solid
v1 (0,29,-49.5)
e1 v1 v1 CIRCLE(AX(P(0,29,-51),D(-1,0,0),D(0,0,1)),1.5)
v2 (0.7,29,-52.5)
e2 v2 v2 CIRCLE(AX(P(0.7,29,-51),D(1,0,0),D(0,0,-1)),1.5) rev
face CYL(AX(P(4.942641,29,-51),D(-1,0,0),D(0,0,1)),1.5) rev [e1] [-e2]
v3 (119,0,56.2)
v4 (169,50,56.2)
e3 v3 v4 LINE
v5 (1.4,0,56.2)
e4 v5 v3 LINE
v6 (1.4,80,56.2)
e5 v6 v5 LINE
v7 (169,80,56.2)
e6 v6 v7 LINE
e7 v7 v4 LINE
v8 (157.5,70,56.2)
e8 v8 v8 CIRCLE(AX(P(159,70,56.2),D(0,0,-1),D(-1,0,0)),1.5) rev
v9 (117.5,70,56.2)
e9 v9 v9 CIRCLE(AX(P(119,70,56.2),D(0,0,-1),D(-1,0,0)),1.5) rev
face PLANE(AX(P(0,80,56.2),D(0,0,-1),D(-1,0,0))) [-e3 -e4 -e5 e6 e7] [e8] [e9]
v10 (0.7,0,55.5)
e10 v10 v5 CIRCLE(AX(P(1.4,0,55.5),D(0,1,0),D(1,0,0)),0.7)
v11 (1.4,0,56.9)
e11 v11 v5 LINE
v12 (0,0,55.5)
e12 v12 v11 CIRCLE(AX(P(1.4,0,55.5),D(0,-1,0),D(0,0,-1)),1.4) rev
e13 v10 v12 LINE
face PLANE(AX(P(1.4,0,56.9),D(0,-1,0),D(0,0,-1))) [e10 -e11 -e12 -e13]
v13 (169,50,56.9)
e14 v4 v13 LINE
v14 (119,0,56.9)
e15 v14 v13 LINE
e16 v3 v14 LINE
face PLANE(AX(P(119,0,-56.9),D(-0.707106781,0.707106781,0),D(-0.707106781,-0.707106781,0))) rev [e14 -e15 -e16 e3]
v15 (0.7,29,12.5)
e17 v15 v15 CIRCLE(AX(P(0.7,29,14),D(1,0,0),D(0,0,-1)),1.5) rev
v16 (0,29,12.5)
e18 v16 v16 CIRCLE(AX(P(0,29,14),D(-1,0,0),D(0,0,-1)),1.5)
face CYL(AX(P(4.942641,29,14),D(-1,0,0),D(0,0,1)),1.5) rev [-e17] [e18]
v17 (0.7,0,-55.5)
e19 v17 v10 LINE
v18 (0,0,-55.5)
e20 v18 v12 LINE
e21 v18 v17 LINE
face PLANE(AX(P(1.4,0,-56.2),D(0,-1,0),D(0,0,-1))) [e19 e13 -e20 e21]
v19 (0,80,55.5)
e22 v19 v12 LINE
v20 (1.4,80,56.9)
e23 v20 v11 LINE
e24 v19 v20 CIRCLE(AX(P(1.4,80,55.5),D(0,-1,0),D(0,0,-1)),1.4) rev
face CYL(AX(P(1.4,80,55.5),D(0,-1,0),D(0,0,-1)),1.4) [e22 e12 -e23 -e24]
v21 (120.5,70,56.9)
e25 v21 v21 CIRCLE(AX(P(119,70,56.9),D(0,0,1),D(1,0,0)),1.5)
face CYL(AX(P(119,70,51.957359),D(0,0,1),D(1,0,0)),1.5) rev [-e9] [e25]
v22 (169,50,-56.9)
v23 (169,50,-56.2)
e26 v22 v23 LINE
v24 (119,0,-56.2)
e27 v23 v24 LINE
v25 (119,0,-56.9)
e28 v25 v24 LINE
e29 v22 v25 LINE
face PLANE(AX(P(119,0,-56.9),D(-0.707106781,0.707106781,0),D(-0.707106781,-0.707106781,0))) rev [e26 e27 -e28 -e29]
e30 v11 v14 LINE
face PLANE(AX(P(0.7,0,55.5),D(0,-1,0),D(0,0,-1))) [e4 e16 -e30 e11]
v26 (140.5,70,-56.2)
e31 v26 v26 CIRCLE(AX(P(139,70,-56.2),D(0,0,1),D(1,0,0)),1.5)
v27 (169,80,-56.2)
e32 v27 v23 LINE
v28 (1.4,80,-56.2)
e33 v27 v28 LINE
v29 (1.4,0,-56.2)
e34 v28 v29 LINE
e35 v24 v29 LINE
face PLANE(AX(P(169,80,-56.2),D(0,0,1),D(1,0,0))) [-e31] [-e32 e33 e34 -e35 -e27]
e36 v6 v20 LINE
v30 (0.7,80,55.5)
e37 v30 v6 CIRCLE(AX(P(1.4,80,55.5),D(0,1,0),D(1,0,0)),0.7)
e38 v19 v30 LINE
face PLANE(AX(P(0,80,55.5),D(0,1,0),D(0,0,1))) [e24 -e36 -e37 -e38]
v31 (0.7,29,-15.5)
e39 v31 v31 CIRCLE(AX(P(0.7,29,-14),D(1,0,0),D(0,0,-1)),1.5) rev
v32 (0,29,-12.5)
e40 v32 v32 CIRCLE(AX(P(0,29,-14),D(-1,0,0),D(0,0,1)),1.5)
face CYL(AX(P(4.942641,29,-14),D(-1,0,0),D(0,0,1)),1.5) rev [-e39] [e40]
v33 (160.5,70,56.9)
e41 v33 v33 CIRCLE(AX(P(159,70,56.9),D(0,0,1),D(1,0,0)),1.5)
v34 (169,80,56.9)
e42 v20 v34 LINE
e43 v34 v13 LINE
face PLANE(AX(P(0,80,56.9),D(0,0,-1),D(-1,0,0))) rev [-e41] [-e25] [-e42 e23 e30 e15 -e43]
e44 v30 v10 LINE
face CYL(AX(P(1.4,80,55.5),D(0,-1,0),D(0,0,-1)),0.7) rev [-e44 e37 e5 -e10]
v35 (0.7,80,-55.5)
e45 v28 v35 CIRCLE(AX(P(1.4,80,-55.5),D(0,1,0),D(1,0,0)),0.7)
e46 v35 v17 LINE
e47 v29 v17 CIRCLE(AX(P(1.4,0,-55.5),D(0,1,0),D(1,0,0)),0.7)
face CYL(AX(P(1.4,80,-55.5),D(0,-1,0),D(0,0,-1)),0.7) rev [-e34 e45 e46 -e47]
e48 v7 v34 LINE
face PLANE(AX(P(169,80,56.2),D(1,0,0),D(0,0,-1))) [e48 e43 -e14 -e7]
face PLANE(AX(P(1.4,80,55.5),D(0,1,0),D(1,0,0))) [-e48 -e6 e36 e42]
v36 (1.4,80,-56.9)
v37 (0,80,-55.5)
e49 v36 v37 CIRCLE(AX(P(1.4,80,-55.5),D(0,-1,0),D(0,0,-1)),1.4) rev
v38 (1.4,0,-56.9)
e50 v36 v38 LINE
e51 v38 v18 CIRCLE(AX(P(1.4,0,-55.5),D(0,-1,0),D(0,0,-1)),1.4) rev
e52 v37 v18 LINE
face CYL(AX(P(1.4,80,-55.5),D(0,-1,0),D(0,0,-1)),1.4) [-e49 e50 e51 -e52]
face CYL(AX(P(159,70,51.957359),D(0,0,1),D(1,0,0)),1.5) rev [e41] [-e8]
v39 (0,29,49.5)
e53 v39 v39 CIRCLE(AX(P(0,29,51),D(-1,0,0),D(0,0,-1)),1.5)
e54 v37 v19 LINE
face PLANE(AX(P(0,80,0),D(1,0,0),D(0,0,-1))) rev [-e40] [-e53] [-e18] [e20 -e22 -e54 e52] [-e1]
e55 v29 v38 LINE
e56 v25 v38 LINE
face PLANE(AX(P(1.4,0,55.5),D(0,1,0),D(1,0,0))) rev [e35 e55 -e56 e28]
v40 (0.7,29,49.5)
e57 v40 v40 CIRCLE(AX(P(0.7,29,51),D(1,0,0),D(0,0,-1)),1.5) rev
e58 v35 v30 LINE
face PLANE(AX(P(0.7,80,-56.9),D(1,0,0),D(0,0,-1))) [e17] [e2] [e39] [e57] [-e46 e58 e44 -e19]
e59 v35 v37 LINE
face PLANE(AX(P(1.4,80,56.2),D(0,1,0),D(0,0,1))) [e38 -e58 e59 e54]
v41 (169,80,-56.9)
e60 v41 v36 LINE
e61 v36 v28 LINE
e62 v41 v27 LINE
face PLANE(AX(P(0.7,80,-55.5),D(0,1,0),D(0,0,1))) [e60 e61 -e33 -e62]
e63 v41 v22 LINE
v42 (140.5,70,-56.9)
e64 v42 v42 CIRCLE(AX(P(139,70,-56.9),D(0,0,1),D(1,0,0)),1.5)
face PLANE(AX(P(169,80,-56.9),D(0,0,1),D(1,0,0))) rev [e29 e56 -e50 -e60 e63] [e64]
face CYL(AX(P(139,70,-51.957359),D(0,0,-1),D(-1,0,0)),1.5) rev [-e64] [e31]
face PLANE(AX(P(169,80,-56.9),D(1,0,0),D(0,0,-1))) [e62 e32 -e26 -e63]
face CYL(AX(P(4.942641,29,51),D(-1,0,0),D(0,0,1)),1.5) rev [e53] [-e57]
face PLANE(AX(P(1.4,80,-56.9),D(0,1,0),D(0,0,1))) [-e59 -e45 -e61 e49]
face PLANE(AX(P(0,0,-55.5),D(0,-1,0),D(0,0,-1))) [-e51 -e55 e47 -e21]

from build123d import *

# Parameters (mm, degrees)
BASE_FLANGE1_DEPTH      = 80
CUT_EXTRUDE1_DEPTH      = 219.886820069
CUT_EXTRUDE1_DEPTH_BACK = 219.886820069
SKETCH7_R               = 1.5
CUT_EXTRUDE3_DEPTH      = 0.7
SKETCH8_R               = 1.5
CUT_EXTRUDE4_DEPTH      = 0.7
SKETCH9_R               = 1.5
CUT_EXTRUDE5_DEPTH      = 0.7


# Sheet-metal steps are written as plain solids
with BuildPart() as part:
    # Sketch1 → Base-Flange1 (new body)
    with BuildSketch(Plane(origin=(0, 0, 0), x_dir=(1, 0, 0), z_dir=(0, 1, 0))):
        with BuildLine():
            Line((169, 56.9), (1.4, 56.9))
            ThreePointArc((1.4, 56.9), (0.410050506, 56.489949494), (0, 55.5))
            Line((0, 55.5), (0, 0))
            Line((0, 0), (0, -55.5))
            ThreePointArc((0, -55.5), (0.410050506, -56.489949494), (1.4, -56.9))
            Line((1.4, -56.9), (169, -56.9))
            Line((169, -56.9), (169, -56.2))
            Line((169, -56.2), (1.4, -56.2))
            ThreePointArc((1.4, -56.2), (0.905025253, -55.994974747), (0.7, -55.5))
            Line((0.7, -55.5), (0.7, 0))
            Line((0.7, 0), (0.7, 55.5))
            ThreePointArc((0.7, 55.5), (0.905025253, 55.994974747), (1.4, 56.2))
            Line((1.4, 56.2), (169, 56.2))
            Line((169, 56.2), (169, 56.9))
        make_face()
    extrude(amount=BASE_FLANGE1_DEPTH)

    # Sketch6 → Cut-Extrude1 (cut, two sides: drawn at the far end of the back side and taken through both)
    with BuildSketch(Plane.XY.offset(56.9).offset(-CUT_EXTRUDE1_DEPTH_BACK)):
        Polygon((169, 50), (169, 0), (119, 0), align=None)
    extrude(amount=CUT_EXTRUDE1_DEPTH + CUT_EXTRUDE1_DEPTH_BACK, mode=Mode.SUBTRACT)

    # Sketch7 → Cut-Extrude3 (cut)
    with BuildSketch(Plane.XY.offset(56.9)):
        with Locations((159, 70)):
            Circle(SKETCH7_R)
        with Locations((119, 70)):
            Circle(SKETCH7_R)
    extrude(amount=-CUT_EXTRUDE3_DEPTH, mode=Mode.SUBTRACT)

    # Sketch8 → Cut-Extrude4 (cut)
    with BuildSketch(Plane.XY.offset(-56.9)):
        with Locations((139, 70)):
            Circle(SKETCH8_R)
    extrude(amount=CUT_EXTRUDE4_DEPTH, mode=Mode.SUBTRACT)

    # Sketch9 → Cut-Extrude5 (cut)
    with BuildSketch(Plane.ZY):
        with Locations((-51, 29)):
            Circle(SKETCH9_R)
        with Locations((-14, 29)):
            Circle(SKETCH9_R)
        with Locations(Location((14, 29, 0), (0, 0, 180))):
            Circle(SKETCH9_R)
        with Locations(Location((51, 29, 0), (0, 0, 180))):
            Circle(SKETCH9_R)
    extrude(amount=-CUT_EXTRUDE5_DEPTH, mode=Mode.SUBTRACT)


solid = part.part
